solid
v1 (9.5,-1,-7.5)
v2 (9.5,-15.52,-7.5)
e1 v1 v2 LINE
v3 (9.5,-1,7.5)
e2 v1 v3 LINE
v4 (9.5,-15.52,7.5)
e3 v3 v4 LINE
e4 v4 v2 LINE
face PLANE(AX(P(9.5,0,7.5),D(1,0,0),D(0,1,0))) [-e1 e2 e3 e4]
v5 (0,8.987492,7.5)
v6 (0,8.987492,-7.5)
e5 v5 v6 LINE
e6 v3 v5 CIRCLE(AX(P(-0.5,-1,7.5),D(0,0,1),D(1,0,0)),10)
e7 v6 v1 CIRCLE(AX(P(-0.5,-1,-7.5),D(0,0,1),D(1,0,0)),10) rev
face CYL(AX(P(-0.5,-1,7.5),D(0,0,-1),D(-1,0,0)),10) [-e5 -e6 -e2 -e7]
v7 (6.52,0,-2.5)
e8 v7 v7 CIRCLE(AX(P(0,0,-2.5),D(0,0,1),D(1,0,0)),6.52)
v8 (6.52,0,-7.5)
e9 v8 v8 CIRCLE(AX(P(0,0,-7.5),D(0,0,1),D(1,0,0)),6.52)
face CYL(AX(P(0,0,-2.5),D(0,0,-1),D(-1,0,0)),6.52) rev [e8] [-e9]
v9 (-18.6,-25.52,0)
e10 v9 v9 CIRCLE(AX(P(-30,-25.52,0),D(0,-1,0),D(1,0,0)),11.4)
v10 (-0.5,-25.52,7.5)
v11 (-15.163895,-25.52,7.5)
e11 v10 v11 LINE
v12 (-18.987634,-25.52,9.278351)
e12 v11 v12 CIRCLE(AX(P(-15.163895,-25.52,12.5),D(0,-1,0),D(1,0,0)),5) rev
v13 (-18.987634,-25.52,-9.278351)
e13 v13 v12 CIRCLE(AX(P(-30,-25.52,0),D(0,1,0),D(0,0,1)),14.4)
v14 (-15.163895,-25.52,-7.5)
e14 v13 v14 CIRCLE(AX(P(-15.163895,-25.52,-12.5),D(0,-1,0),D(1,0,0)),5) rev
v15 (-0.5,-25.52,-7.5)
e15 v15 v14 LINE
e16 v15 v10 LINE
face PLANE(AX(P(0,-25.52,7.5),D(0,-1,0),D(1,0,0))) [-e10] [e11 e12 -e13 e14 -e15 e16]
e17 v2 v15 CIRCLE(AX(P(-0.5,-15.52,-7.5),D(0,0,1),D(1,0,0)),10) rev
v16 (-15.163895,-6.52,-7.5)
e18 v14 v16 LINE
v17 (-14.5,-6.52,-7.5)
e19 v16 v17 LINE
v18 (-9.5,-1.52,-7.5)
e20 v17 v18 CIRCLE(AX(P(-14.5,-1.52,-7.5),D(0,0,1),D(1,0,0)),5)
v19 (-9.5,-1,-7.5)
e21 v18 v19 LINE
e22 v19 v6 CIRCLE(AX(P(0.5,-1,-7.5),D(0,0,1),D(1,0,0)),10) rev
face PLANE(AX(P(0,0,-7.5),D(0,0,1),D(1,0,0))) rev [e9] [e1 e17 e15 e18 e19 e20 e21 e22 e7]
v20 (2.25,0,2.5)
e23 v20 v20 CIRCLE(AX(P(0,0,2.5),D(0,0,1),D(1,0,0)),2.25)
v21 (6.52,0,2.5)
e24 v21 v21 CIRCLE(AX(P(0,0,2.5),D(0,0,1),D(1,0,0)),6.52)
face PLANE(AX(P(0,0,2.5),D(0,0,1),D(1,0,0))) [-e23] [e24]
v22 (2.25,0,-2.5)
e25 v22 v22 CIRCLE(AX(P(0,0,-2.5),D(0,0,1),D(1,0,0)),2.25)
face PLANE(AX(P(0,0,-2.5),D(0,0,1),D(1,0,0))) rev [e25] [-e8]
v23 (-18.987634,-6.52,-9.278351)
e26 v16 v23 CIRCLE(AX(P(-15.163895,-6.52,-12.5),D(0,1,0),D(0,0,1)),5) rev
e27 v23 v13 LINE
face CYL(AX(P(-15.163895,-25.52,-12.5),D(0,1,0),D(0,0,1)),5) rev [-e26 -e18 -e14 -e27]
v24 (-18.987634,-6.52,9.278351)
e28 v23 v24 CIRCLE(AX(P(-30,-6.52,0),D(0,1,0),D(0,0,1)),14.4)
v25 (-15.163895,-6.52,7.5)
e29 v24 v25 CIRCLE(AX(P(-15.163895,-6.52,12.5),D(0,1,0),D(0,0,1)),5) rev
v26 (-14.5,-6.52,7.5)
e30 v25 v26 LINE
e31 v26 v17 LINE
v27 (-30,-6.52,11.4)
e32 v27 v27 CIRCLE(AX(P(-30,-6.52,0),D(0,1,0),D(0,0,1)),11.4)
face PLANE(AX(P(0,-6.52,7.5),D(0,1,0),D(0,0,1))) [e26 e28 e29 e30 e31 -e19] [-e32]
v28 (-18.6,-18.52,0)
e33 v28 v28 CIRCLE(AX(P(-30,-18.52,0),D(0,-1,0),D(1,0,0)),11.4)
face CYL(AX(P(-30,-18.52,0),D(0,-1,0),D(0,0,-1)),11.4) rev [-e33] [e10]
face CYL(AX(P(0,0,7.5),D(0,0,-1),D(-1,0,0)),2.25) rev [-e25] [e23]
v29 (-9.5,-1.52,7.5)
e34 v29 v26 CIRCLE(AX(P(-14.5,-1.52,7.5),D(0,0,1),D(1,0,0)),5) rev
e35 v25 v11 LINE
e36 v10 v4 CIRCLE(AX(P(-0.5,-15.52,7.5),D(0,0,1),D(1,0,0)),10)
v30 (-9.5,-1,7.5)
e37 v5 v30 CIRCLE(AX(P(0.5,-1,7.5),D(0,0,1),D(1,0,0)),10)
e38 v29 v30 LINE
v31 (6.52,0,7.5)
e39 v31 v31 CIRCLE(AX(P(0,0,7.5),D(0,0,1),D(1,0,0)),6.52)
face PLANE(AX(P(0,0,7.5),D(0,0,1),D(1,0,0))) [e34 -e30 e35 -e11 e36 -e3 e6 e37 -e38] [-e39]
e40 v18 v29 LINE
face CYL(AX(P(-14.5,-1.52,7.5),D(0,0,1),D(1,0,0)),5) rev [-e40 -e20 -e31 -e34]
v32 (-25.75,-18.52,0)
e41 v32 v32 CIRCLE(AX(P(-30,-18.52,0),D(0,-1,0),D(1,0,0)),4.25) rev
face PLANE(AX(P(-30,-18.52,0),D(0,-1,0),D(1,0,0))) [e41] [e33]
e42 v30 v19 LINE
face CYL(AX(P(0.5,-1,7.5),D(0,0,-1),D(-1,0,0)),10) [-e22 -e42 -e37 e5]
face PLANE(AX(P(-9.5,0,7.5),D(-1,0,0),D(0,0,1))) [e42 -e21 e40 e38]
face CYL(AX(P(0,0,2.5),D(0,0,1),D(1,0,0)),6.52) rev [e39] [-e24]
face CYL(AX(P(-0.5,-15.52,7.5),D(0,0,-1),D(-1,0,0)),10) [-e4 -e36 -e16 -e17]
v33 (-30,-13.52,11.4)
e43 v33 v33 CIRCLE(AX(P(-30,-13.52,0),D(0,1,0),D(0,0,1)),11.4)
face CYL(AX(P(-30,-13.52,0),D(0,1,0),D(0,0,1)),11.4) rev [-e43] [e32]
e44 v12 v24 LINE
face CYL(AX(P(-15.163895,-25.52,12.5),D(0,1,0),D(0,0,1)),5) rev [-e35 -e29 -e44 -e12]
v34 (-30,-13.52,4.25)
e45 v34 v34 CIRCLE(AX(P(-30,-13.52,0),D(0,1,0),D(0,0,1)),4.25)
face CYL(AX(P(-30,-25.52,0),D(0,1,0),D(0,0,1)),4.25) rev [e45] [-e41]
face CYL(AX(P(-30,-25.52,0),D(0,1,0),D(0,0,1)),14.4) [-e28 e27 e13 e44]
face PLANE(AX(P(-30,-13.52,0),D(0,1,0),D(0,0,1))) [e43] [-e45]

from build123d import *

# Parameters (mm, degrees)
SKETCH1_R               = 6.52
SKETCH1_R_2             = 2.25
BOSS_EXTRUDE1_DEPTH     = 7.5
CUT_EXTRUDE1_START      = 7.5
SKETCH1_3_R             = 6.52
CUT_EXTRUDE1_DEPTH      = 5
CUT_EXTRUDE2_START      = -2.5
SKETCH1_4_R             = 6.52
CUT_EXTRUDE2_DEPTH      = 5
SKETCH2_R               = 14.4
BOSS_EXTRUDE2_DEPTH     = 19
CUT_EXTRUDE3_DEPTH      = 51.395634732
CUT_EXTRUDE3_DEPTH_BACK = 51.395634732
CUT_EXTRUDE4_DEPTH      = 7
CUT_EXTRUDE5_START      = -12
SKETCH2_5_R             = 11.4
CUT_EXTRUDE5_DEPTH      = 7
FILLET1_R               = 5
FILLET2_R               = 10


with BuildPart() as part:
    # Sketch1 → Boss-Extrude1 (new, symmetric)
    # profile 1 of 3: a face of its own
    with BuildSketch(Plane.XY):
        Polygon((-4.7e-08, -6.52), (-9.5, -6.52), (-16.20264212, -6.52), (-30, -6.52), (-30, -25.52), (9.5, -25.52), (9.5, -6.52), align=None)
    # profile 2 of 3: a face of its own
    with BuildSketch(Plane.XY):
        Polygon((9.5, 9), (-9.5, 9), (-9.5, -6.52), (-4.7e-08, -6.52), (9.5, -6.52), align=None)
        with BuildLine():
            ThreePointArc((6.52, 0), (4.610336197, -4.61033623), (-4.7e-08, -6.52))
            ThreePointArc((-4.7e-08, -6.52), (-4.610336197, 4.61033623), (6.52, 0))
        make_face(mode=Mode.SUBTRACT)
    # profile 3 of 3: a face of its own
    with BuildSketch(Plane.XY):
        Circle(SKETCH1_R)
        Circle(SKETCH1_R_2, mode=Mode.SUBTRACT)
    extrude(amount=BOSS_EXTRUDE1_DEPTH, both=True)

    # Sketch1<3> → Cut-Extrude1 (cut)
    with BuildSketch(Plane.XY.offset(CUT_EXTRUDE1_START)):
        Circle(SKETCH1_3_R)
    extrude(amount=-CUT_EXTRUDE1_DEPTH, mode=Mode.SUBTRACT)

    # Sketch1<4> → Cut-Extrude2 (cut)
    with BuildSketch(Plane.XY.offset(CUT_EXTRUDE2_START)):
        Circle(SKETCH1_4_R)
    extrude(amount=-CUT_EXTRUDE2_DEPTH, mode=Mode.SUBTRACT)

    # Sketch2 → Boss-Extrude2 (add, through all)
    with BuildSketch(Plane(origin=(0, -6.52, 0), x_dir=(1, 0, 0), z_dir=(0, 1, 0))):
        with Locations((-30, 0)):
            Circle(SKETCH2_R)
    extrude(amount=-BOSS_EXTRUDE2_DEPTH)

    # Sketch2<3> → Cut-Extrude3 (cut, two sides: drawn at the far end of the back side and taken through both)
    with BuildSketch(Plane(origin=(0, -6.52, 0), x_dir=(1, 0, 0), z_dir=(0, 1, 0)).offset(-CUT_EXTRUDE3_DEPTH_BACK)):
        with BuildLine():
            ThreePointArc((-30, -4.25), (-26.99479618, -3.00520382), (-25.75, 0))
            ThreePointArc((-25.75, 0), (-26.99479618, 3.00520382), (-30, 4.25))
            Line((-30, 4.25), (-30, -4.25))
        make_face()
        with BuildLine():
            Line((-30, -4.25), (-30, 4.25))
            ThreePointArc((-30, 4.25), (-34.25, 0), (-30, -4.25))
        make_face()
    extrude(amount=CUT_EXTRUDE3_DEPTH + CUT_EXTRUDE3_DEPTH_BACK, mode=Mode.SUBTRACT)

    # Sketch2<4> → Cut-Extrude4 (cut)
    with BuildSketch(Plane(origin=(0, -6.52, 0), x_dir=(1, 0, 0), z_dir=(0, 1, 0))):
        with BuildLine():
            ThreePointArc((-21.414547187, -7.5), (-19.326805491, -4.005361278), (-18.6, 0))
            ThreePointArc((-18.6, 0), (-19.326805491, 4.005361278), (-21.414547187, 7.5))
            Line((-21.414547187, 7.5), (-30, 7.5))
            Line((-30, 7.5), (-30, 4.25))
            ThreePointArc((-30, 4.25), (-26.99479618, 3.00520382), (-25.75, 0))
            ThreePointArc((-25.75, 0), (-26.99479618, -3.00520382), (-30, -4.25))
            Line((-30, -4.25), (-30, -7.5))
            Line((-30, -7.5), (-21.414547187, -7.5))
        make_face()
        with BuildLine():
            Line((-30, 7.5), (-21.414547187, 7.5))
            ThreePointArc((-21.414547187, 7.5), (-41.4, 0), (-21.414547187, -7.5))
            Line((-21.414547187, -7.5), (-30, -7.5))
            Line((-30, -7.5), (-30, -4.25))
            ThreePointArc((-30, -4.25), (-34.25, 0), (-30, 4.25))
            Line((-30, 4.25), (-30, 7.5))
        make_face()
    extrude(amount=-CUT_EXTRUDE4_DEPTH, mode=Mode.SUBTRACT)

    # Sketch2<5> → Cut-Extrude5 (cut)
    with BuildSketch(Plane(origin=(0, -6.52, 0), x_dir=(1, 0, 0), z_dir=(0, 1, 0)).offset(CUT_EXTRUDE5_START)):
        with Locations(Location((-30, 0, 0), (0, 0, 270))):
            Circle(SKETCH2_5_R)
    extrude(amount=-CUT_EXTRUDE5_DEPTH, mode=Mode.SUBTRACT)

    # Fillet1
    fillet1_edges = [part.edges().sort_by_distance(p)[0] for p in [
        (-9.5, -6.52, 0),
        (-17.707319251, -16.02, -7.5),
        (-17.707319251, -16.02, 7.5),
    ]]
    fillet(fillet1_edges, radius=FILLET1_R)

    # Fillet2
    # the kernel refuses this fillet: 10 mm, written as the material it takes off along each edge
    with BuildSketch(Plane(origin=(-9.5, 9, -32.5), x_dir=(0, -1, 0), z_dir=(0, 0, 1)), Plane(origin=(9.5, 9, -32.5), x_dir=(-1, 0, 0), z_dir=(0, 0, 1)), Plane(origin=(9.5, -25.52, 32.5), x_dir=(-1, 0, 0), z_dir=(0, 0, -1))) as fillet2_piece_1:
        with BuildLine():
            CenterArc((FILLET2_R, FILLET2_R), FILLET2_R, 180, 90)
            Line((0, FILLET2_R), (0, 0))
            Line((0, 0), (FILLET2_R, 0))
        make_face()
    extrude(amount=65, mode=Mode.SUBTRACT)


solid = part.part
